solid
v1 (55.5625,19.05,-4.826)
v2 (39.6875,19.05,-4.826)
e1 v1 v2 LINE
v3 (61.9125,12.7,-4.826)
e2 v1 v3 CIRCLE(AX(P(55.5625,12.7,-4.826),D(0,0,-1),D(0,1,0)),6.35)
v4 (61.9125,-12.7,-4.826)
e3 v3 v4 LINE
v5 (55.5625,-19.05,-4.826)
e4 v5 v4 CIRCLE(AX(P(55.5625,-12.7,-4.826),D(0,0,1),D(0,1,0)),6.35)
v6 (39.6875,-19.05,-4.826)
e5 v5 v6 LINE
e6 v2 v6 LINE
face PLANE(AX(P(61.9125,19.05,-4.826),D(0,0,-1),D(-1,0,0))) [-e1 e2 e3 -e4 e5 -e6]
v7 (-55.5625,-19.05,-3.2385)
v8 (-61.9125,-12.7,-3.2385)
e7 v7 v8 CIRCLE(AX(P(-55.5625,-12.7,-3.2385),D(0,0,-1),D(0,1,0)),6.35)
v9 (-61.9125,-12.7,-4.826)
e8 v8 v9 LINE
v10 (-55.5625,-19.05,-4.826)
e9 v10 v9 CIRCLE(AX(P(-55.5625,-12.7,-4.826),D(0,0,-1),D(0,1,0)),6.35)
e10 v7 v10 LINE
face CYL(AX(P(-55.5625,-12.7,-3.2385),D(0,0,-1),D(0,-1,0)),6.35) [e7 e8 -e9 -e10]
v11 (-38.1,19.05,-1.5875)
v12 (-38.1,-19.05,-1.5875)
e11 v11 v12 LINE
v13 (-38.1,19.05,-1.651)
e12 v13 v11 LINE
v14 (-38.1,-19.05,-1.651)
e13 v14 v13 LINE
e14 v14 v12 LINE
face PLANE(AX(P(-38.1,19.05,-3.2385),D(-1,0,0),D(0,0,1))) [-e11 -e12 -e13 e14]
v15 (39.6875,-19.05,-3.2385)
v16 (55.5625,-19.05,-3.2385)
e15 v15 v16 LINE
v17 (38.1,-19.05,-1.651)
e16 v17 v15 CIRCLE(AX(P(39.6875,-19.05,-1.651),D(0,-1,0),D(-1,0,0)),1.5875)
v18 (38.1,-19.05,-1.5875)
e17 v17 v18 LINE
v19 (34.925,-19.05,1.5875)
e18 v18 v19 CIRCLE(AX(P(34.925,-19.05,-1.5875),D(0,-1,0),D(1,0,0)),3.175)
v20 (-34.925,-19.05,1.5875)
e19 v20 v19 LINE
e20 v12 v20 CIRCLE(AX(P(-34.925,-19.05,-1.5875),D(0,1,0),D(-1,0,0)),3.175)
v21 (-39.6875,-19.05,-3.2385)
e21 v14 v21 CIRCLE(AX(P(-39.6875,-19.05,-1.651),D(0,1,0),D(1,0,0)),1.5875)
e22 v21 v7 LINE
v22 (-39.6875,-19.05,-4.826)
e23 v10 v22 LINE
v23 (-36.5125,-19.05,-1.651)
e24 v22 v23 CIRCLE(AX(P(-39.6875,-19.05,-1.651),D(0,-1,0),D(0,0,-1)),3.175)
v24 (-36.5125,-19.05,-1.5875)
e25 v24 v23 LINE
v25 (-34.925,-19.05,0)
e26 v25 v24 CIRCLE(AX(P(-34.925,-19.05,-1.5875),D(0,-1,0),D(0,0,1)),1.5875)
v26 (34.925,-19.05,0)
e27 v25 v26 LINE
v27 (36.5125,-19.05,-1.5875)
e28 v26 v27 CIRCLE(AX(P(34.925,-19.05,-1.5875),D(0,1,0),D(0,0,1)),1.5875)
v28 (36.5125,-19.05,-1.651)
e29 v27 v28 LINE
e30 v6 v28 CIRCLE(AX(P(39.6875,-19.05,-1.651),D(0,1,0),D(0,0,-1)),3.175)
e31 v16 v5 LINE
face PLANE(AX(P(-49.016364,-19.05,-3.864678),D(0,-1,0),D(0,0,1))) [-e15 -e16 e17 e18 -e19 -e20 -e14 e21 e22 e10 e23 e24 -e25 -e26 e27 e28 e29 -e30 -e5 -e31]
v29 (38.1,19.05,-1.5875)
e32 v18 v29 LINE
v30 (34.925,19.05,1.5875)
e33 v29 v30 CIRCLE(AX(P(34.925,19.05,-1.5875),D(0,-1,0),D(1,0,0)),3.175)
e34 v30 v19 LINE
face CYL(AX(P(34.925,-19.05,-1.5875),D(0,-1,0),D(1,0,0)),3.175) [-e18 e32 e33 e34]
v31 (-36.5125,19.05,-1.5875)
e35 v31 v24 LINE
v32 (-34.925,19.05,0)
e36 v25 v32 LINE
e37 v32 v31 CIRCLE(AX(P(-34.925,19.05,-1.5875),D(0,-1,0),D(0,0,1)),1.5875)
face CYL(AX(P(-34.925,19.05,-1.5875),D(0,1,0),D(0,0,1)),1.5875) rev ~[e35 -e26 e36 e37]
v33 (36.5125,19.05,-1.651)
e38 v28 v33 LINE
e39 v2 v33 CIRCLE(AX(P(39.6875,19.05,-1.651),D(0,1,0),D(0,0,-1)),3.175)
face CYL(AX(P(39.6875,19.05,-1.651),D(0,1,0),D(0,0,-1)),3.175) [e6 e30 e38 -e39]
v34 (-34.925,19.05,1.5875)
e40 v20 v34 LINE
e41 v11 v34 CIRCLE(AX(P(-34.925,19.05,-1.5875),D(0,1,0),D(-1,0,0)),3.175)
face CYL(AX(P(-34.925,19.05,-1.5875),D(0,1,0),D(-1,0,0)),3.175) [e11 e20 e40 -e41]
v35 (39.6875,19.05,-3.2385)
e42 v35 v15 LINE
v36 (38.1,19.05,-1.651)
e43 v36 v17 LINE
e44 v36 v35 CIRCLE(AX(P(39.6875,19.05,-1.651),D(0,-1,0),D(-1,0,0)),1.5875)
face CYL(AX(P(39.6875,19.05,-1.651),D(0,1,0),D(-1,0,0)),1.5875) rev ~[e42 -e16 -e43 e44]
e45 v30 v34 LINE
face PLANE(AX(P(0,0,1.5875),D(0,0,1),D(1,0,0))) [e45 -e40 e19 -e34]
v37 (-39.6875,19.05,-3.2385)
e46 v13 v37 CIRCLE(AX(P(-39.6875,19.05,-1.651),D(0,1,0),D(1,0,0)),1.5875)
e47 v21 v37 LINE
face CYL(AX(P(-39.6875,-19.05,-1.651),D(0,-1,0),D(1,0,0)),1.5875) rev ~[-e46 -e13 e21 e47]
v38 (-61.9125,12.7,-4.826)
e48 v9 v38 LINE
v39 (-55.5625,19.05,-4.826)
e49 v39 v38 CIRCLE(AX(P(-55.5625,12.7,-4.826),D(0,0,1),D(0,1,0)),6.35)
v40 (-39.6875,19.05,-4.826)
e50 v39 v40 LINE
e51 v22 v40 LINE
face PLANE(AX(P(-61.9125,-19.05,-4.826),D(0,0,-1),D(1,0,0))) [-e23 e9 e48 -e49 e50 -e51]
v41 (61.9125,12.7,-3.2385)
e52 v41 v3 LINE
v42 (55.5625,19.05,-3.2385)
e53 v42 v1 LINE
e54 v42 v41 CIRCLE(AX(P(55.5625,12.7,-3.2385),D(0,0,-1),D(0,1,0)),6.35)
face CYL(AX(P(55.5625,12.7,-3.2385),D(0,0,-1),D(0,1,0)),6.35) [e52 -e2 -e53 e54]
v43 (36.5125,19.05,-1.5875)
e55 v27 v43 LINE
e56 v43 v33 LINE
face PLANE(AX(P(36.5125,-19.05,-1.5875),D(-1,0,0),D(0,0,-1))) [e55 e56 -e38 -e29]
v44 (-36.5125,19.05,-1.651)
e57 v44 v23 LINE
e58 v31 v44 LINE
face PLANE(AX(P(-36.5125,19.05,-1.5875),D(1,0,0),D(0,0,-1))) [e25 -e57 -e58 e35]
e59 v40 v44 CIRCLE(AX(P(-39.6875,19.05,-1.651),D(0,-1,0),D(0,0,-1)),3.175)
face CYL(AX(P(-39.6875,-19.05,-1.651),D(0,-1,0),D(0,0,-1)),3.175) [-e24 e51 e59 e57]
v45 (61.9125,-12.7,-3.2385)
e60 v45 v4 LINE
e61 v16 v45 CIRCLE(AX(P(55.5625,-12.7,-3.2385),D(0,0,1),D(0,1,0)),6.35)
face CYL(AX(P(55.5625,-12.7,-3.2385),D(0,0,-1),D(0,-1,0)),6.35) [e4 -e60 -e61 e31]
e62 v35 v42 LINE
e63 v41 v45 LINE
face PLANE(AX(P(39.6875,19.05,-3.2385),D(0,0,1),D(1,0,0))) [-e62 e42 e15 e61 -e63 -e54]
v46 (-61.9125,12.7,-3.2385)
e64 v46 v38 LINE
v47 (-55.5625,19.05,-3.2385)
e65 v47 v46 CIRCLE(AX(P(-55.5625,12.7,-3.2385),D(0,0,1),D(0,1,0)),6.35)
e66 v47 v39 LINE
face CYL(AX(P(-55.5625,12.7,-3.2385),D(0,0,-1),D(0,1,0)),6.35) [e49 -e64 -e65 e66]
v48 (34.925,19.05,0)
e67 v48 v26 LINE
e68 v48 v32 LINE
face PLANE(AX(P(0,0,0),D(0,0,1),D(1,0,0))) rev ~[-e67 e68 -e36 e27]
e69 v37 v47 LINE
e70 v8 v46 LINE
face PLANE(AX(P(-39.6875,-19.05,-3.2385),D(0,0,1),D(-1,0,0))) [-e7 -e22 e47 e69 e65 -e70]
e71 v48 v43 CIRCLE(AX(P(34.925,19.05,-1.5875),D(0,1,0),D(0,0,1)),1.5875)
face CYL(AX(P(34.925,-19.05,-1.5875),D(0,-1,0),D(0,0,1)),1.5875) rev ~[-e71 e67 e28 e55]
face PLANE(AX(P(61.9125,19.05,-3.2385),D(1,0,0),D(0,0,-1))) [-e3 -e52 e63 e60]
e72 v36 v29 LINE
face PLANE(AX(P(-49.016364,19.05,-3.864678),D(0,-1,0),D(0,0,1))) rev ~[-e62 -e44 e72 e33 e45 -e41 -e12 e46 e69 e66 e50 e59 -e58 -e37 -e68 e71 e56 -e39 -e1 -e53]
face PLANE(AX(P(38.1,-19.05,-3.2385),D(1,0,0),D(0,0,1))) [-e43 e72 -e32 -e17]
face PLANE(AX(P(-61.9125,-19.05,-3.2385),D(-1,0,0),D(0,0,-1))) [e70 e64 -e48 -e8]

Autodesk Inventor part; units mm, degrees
ref_plane "YZ Plane" through (0, 0, 0) normal (1, 0, 0) x (0, 1, 0)
ref_plane "XZ Plane" through (0, 0, 0) normal (0, 1, 0) x (-1, 0, 0)
ref_plane "XY Plane" through (0, 0, 0) normal (0, 0, 1) x (1, 0, 0)
sketch "Sketch1" plane through (0, 0, 0) normal (0, 0, 1) x (1, 0, 0)
  line L0 (-38.1, -19.05) -> (38.1, -19.05)
  line L1 (38.1, -19.05) -> (38.1, 19.05)
  line L2 (38.1, 19.05) -> (-38.1, 19.05)
  line L3 (-38.1, 19.05) -> (-38.1, -19.05)
  line L4 (-38.1, -19.05) -> (38.1, 19.05) construction
  line L5 (38.1, -19.05) -> (-38.1, 19.05) construction
  point P0 (0, 0)
  dimension "d0" = 76.2
  dimension "d1" = 38.1
extrude "Plate1" add sketch "Sketch1" along normal blind 1.5875
sketch "Sketch2" plane through (36.5125, -19.05, 1.5875) normal (1, 0, 0) x (0, 1, 0)
  line L0 (38.1, 0) -> (0, 0)
  line L1 (0, 0) -> (0, -4.826)
  line L2 (0, -4.826) -> (38.1, -4.826)
  line L3 (38.1, -4.826) -> (38.1, 0)
edge flange "Flange1" height 4.826 angle 90 thickness 1.5875 bend radius 1.5875 thickness toward (1, 0, 0) relief tear relief width 1.5875 relief depth 0.7937 corner gap 1.5875 corner form 0 edges at (38.1, 0, 0) (-38.1, 0, 0) wall of the first edge with corners at (36.5125, 19.05, 1.5875) (36.5125, -19.05, 1.5875) (36.5125, -19.05, -3.2385) (36.5125, 19.05, -3.2385)
bend "Bend1"
corner "Corner1"
sketch "Sketch3" plane through (-38.1, -19.05, -3.2385) normal (0, 0, -1) x (-1, 0, 0)
  line L0 (0, 38.1) -> (0, 0)
  line L1 (0, 0) -> (23.8125, 0)
  line L2 (23.8125, 0) -> (23.8125, 38.1)
  line L3 (23.8125, 38.1) -> (0, 38.1)
edge flange "Flange2" height 25.4 angle 90 thickness 1.5875 bend radius 1.5875 thickness toward (0, 0, -1) relief tear relief width 1.5875 relief depth 0.7937 corner gap 1.5875 corner form 0 edges at (-38.1, 0, -3.2385) (38.1, 0, -3.2385) wall of the first edge with corners at (-38.1, 19.05, -3.2385) (-38.1, -19.05, -3.2385) (-61.9125, -19.05, -3.2385) (-61.9125, 19.05, -3.2385)
bend "Bend2"
corner "Corner2"
fillet "Fillet1" radius 6.35 4 edges at (-61.9125, 19.05, -4.0323) (-61.9125, -19.05, -4.0323) (61.9125, -19.05, -4.0323) (61.9125, 19.05, -4.0323)
equation "\"d3\" = BendReliefWidth"
equation "\"d4\" = BendReliefDepth"
equation "\"d5\" = MinimumRemnant"
equation "\"d6\" = BendRadius"
equation "\"d9\" = BendRadius"
equation "\"d10\" = CornerReliefSize"
equation "\"d11\" = GapSize"
equation "\"d12\" = JacobiRadiusSize"
equation "\"d13\" = BendReliefWidth"
equation "\"d14\" = BendReliefDepth"
equation "\"d15\" = MinimumRemnant"
equation "\"d16\" = BendRadius"
equation "\"d19\" = BendRadius"
equation "\"d20\" = CornerReliefSize"
equation "\"d21\" = GapSize"
equation "\"d22\" = JacobiRadiusSize"
equation "\"BendRadius\" = Thickness"
equation "\"BendReliefWidth\" = Thickness"
equation "\"BendReliefDepth\" = 0.5 * Thickness"
equation "\"CornerReliefSize\" = 4 * Thickness"
equation "\"MinimumRemnant\" = 2 * Thickness"
equation "\"TransitionRadius\" = BendRadius"
equation "\"JacobiRadiusSize\" = BendRadius"
equation "\"GapSize\" = Thickness"
equation "\"d2\" = BendRadius"
equation "\"Thickness\" = 1.5875"
properties part number "Center Rail Bracket" material "Steel, Galvanized"
